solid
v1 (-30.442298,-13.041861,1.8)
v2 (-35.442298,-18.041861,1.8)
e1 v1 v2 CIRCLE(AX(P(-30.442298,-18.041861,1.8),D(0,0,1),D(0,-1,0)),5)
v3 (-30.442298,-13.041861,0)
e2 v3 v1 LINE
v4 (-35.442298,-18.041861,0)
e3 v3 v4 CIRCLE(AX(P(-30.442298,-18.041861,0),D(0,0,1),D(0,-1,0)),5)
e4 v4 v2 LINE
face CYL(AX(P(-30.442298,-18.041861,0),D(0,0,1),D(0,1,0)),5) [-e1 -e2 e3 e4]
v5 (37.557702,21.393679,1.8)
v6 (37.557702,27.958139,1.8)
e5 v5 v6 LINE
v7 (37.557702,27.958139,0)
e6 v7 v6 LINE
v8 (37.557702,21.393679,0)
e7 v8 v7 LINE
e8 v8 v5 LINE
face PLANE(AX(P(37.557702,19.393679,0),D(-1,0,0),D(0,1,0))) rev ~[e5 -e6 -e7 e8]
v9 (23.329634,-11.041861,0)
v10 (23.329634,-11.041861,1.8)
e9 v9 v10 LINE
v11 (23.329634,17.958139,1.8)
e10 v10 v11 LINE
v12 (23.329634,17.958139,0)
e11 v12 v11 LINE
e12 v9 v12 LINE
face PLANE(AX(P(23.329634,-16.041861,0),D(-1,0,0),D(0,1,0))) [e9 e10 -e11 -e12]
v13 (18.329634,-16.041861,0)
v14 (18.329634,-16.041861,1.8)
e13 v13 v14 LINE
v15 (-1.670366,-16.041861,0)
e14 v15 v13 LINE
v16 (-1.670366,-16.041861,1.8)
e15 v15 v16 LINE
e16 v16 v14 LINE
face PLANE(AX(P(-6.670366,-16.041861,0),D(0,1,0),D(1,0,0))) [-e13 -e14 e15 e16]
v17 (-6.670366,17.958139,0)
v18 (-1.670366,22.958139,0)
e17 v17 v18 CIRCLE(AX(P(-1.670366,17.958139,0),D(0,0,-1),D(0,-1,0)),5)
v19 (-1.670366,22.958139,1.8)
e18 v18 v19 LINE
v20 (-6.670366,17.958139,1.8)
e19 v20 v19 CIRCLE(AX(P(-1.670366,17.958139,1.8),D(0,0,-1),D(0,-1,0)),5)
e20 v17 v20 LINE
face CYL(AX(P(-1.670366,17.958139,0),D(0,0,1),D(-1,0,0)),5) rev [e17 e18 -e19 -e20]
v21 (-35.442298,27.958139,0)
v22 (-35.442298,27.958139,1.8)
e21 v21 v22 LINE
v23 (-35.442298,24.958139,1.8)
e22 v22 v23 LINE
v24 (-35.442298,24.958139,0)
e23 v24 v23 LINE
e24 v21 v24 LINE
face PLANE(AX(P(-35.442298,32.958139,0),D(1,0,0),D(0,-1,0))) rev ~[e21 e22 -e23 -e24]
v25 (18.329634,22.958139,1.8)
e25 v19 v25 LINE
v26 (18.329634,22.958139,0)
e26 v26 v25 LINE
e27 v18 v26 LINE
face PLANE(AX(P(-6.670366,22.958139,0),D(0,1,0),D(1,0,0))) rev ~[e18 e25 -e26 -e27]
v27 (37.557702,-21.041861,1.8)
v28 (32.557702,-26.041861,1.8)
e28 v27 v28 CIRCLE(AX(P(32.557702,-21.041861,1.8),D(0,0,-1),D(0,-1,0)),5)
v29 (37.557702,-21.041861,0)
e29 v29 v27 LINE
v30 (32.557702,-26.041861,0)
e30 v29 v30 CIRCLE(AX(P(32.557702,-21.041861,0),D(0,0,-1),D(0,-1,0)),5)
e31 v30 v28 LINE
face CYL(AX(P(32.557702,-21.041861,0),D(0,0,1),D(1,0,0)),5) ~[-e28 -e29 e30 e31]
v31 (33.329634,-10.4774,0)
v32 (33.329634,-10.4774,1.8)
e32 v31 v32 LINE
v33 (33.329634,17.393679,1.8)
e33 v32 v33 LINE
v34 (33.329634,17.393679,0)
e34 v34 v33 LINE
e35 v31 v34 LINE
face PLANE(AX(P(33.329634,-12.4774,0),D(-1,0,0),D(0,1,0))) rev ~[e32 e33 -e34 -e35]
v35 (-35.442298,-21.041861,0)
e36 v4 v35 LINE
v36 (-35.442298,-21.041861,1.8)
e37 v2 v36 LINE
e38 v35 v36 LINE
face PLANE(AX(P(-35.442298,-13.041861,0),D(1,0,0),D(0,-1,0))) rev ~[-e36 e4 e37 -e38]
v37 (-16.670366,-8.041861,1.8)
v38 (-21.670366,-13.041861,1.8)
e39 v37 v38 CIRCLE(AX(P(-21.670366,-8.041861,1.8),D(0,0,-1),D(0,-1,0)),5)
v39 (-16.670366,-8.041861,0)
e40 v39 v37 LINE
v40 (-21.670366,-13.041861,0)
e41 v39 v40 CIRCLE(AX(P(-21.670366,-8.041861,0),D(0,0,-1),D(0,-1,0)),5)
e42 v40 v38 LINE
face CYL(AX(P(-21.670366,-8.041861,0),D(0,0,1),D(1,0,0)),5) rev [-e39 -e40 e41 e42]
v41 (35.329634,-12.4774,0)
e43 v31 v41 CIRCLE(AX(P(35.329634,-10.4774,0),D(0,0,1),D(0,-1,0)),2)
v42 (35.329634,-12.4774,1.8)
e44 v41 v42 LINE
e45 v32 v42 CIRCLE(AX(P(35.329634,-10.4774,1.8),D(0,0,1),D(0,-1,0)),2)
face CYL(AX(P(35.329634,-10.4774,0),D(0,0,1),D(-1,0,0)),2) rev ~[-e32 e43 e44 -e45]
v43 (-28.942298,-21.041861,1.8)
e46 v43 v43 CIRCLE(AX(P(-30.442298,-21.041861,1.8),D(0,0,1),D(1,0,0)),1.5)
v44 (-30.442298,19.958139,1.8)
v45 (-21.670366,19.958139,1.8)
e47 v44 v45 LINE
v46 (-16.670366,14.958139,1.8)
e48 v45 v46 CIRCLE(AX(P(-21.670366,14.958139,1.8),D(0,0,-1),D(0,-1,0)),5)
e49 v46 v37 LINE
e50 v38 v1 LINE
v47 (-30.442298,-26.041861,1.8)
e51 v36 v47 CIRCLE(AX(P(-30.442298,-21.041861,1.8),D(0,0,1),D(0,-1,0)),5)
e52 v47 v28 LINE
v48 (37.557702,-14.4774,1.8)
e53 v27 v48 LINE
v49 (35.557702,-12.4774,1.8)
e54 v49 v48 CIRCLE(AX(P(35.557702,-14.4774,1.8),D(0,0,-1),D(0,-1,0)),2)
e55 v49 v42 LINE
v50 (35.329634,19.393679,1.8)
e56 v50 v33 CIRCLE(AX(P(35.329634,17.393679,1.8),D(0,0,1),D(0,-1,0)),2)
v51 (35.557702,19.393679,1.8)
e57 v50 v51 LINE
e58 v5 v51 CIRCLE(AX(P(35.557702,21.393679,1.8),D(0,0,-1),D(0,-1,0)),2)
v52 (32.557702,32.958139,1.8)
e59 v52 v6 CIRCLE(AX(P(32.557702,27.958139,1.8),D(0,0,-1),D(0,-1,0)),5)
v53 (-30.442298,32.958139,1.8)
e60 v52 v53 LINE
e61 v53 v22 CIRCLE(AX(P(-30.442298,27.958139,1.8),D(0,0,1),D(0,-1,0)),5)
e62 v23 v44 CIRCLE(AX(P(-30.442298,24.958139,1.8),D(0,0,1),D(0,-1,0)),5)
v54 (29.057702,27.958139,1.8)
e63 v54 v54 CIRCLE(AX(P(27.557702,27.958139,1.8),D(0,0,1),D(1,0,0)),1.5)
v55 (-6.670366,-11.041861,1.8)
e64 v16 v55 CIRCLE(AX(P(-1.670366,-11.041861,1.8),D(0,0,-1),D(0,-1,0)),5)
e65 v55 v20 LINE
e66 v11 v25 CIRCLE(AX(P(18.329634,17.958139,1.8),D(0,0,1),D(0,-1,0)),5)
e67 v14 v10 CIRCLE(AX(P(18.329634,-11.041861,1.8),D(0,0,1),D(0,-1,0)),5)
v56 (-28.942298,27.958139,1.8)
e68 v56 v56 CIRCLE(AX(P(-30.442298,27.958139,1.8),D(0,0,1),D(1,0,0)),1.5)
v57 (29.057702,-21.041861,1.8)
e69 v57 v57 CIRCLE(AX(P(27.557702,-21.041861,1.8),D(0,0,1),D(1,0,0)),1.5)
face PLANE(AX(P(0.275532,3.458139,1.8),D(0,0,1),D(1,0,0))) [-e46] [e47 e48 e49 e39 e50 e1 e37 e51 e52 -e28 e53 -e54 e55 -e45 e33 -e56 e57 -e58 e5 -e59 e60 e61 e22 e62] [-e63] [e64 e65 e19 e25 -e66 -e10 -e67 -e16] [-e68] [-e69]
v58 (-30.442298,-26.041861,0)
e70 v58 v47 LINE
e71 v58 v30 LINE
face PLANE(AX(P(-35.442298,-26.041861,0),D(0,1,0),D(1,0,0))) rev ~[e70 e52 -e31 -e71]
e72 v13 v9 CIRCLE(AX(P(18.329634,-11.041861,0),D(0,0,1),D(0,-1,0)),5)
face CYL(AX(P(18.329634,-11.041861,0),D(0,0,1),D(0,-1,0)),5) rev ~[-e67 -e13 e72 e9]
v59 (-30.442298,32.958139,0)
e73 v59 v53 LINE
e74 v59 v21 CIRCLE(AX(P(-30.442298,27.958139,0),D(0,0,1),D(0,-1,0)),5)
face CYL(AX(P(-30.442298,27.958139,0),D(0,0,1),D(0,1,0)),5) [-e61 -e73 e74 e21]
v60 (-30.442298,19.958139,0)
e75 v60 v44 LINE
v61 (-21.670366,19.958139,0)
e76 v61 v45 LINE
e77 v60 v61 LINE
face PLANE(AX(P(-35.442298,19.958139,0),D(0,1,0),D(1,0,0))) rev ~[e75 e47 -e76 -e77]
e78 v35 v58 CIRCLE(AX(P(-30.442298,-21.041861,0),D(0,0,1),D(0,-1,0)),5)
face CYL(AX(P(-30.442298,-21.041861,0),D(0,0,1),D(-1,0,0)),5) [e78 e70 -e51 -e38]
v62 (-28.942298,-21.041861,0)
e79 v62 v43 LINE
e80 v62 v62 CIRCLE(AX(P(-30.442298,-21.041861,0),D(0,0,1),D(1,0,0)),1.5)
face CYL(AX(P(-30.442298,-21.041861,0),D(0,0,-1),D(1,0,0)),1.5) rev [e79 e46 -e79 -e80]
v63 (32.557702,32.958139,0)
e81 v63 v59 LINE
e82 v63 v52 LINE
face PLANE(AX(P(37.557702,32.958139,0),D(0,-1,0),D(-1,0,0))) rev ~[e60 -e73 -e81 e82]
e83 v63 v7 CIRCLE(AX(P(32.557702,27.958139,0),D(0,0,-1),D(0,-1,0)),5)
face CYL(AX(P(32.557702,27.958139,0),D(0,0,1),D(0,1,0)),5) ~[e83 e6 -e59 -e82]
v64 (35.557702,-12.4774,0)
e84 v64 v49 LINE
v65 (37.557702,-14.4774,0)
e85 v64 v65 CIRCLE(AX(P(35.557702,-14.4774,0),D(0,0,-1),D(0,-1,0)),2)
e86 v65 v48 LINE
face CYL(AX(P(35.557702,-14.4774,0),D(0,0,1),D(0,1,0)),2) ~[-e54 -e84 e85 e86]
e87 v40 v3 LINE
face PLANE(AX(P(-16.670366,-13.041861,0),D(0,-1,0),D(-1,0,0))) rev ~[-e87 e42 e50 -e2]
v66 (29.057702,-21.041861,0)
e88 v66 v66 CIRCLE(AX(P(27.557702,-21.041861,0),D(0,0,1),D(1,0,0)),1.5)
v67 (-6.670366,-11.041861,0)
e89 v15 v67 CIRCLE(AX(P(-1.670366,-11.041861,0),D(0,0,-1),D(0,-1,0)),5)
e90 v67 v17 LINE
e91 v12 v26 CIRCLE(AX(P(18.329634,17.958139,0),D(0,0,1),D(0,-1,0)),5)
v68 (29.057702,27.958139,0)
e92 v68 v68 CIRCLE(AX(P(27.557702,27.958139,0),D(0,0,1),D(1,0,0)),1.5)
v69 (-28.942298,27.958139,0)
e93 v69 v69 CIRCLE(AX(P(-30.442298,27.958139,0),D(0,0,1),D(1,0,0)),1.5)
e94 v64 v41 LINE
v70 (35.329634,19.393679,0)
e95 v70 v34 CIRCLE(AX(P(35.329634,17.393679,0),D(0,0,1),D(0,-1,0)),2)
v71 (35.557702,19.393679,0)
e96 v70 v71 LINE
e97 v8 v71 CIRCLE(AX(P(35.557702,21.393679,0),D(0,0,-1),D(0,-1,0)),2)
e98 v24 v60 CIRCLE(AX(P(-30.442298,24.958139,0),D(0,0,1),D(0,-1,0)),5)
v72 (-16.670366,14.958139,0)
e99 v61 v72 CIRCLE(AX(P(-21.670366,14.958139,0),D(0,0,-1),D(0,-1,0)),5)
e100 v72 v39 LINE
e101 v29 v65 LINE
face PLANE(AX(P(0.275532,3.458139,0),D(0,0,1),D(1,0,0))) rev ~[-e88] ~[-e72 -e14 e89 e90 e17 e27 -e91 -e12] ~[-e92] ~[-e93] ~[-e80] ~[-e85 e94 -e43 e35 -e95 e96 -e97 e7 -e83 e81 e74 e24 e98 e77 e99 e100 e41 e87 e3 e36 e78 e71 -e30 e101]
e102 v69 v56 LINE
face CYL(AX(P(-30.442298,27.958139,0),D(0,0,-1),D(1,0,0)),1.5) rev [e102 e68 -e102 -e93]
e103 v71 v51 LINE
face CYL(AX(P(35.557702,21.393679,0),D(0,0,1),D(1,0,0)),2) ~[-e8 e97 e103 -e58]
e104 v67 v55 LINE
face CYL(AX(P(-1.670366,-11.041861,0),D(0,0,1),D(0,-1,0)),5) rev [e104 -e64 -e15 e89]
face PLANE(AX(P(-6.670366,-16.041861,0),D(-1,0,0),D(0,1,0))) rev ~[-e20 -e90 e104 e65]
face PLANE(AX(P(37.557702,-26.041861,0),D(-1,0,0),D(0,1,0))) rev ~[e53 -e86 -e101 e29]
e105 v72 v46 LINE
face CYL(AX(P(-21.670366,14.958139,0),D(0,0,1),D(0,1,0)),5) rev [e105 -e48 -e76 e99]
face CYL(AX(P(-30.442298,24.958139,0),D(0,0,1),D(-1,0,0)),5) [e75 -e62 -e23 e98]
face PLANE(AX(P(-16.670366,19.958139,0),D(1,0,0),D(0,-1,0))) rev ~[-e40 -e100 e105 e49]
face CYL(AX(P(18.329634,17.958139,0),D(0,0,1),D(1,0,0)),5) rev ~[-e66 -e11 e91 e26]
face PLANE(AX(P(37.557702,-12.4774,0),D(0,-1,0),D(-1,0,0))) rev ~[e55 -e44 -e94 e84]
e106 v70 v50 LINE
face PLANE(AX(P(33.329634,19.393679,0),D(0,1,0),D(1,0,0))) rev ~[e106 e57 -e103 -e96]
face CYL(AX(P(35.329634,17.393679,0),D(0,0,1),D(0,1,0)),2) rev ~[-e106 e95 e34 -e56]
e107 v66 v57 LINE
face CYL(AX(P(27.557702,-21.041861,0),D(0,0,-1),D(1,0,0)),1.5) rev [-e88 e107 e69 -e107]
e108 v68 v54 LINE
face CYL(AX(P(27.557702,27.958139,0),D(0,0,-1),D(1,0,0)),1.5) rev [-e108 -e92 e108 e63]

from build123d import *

# Parameters (mm, degrees)
F2_R     = 1.5
F2_W     = 30
F2_H     = 39
F3_DEPTH = 1.8
F5_R     = 5
F6_R     = 2


with BuildPart() as f3:
    # F2 (on Top) → F3 (new body)
    with BuildSketch(Plane.XY):
        Polygon((37.5577017069, 32.9581392366), (-35.4422982931, 32.9581392366), (-35.4422982931, 19.9581392366), (-16.6703661359, 19.9581392366), (-16.6703661359, -13.0418607634), (-35.4422982931, -13.0418607634), (-35.4422982931, -26.0418607634), (37.5577017069, -26.0418607634), (37.5577017069, -12.4774002814), (33.3296338641, -12.4774002814), (33.3296338641, 19.3936787546), (37.5577017069, 19.3936787546), align=None)
        with Locations((-30.4422982931, -21.0418607634)):
            Circle(F2_R, mode=Mode.SUBTRACT)
        with Locations((27.5577017069, -21.0418607634)):
            Circle(F2_R, mode=Mode.SUBTRACT)
        with Locations((8.3296338641, 3.4581392366)):
            Rectangle(F2_W, F2_H, mode=Mode.SUBTRACT)
        with Locations((-30.4422982931, 27.9581392366)):
            Circle(F2_R, mode=Mode.SUBTRACT)
        with Locations((27.5577017069, 27.9581392366)):
            Circle(F2_R, mode=Mode.SUBTRACT)
    extrude(amount=F3_DEPTH)

    # F5
    f5_edges = [f3.edges().sort_by_distance(p)[0] for p in [
        (-6.670366, 22.958139, 0.9),
        (-6.670366, -16.041861, 0.9),
        (23.329634, -16.041861, 0.9),
        (23.329634, 22.958139, 0.9),
        (-35.442298, -26.041861, 0.9),
        (37.557702, 32.958139, 0.9),
        (-35.442298, 32.958139, 0.9),
        (-16.670366, -13.041861, 0.9),
        (-16.670366, 19.958139, 0.9),
        (-35.442298, 19.958139, 0.9),
        (-35.442298, -13.041861, 0.9),
        (37.557702, -26.041861, 0.9),
    ]]
    fillet(f5_edges, radius=F5_R)

    # F6
    f6_edges = [f3.edges().sort_by_distance(p)[0] for p in [
        (37.557702, 19.393679, 0.9),
        (37.557702, -12.4774, 0.9),
        (33.329634, 19.393679, 0.9),
        (33.329634, -12.4774, 0.9),
    ]]
    fillet(f6_edges, radius=F6_R)


solid = f3.part
